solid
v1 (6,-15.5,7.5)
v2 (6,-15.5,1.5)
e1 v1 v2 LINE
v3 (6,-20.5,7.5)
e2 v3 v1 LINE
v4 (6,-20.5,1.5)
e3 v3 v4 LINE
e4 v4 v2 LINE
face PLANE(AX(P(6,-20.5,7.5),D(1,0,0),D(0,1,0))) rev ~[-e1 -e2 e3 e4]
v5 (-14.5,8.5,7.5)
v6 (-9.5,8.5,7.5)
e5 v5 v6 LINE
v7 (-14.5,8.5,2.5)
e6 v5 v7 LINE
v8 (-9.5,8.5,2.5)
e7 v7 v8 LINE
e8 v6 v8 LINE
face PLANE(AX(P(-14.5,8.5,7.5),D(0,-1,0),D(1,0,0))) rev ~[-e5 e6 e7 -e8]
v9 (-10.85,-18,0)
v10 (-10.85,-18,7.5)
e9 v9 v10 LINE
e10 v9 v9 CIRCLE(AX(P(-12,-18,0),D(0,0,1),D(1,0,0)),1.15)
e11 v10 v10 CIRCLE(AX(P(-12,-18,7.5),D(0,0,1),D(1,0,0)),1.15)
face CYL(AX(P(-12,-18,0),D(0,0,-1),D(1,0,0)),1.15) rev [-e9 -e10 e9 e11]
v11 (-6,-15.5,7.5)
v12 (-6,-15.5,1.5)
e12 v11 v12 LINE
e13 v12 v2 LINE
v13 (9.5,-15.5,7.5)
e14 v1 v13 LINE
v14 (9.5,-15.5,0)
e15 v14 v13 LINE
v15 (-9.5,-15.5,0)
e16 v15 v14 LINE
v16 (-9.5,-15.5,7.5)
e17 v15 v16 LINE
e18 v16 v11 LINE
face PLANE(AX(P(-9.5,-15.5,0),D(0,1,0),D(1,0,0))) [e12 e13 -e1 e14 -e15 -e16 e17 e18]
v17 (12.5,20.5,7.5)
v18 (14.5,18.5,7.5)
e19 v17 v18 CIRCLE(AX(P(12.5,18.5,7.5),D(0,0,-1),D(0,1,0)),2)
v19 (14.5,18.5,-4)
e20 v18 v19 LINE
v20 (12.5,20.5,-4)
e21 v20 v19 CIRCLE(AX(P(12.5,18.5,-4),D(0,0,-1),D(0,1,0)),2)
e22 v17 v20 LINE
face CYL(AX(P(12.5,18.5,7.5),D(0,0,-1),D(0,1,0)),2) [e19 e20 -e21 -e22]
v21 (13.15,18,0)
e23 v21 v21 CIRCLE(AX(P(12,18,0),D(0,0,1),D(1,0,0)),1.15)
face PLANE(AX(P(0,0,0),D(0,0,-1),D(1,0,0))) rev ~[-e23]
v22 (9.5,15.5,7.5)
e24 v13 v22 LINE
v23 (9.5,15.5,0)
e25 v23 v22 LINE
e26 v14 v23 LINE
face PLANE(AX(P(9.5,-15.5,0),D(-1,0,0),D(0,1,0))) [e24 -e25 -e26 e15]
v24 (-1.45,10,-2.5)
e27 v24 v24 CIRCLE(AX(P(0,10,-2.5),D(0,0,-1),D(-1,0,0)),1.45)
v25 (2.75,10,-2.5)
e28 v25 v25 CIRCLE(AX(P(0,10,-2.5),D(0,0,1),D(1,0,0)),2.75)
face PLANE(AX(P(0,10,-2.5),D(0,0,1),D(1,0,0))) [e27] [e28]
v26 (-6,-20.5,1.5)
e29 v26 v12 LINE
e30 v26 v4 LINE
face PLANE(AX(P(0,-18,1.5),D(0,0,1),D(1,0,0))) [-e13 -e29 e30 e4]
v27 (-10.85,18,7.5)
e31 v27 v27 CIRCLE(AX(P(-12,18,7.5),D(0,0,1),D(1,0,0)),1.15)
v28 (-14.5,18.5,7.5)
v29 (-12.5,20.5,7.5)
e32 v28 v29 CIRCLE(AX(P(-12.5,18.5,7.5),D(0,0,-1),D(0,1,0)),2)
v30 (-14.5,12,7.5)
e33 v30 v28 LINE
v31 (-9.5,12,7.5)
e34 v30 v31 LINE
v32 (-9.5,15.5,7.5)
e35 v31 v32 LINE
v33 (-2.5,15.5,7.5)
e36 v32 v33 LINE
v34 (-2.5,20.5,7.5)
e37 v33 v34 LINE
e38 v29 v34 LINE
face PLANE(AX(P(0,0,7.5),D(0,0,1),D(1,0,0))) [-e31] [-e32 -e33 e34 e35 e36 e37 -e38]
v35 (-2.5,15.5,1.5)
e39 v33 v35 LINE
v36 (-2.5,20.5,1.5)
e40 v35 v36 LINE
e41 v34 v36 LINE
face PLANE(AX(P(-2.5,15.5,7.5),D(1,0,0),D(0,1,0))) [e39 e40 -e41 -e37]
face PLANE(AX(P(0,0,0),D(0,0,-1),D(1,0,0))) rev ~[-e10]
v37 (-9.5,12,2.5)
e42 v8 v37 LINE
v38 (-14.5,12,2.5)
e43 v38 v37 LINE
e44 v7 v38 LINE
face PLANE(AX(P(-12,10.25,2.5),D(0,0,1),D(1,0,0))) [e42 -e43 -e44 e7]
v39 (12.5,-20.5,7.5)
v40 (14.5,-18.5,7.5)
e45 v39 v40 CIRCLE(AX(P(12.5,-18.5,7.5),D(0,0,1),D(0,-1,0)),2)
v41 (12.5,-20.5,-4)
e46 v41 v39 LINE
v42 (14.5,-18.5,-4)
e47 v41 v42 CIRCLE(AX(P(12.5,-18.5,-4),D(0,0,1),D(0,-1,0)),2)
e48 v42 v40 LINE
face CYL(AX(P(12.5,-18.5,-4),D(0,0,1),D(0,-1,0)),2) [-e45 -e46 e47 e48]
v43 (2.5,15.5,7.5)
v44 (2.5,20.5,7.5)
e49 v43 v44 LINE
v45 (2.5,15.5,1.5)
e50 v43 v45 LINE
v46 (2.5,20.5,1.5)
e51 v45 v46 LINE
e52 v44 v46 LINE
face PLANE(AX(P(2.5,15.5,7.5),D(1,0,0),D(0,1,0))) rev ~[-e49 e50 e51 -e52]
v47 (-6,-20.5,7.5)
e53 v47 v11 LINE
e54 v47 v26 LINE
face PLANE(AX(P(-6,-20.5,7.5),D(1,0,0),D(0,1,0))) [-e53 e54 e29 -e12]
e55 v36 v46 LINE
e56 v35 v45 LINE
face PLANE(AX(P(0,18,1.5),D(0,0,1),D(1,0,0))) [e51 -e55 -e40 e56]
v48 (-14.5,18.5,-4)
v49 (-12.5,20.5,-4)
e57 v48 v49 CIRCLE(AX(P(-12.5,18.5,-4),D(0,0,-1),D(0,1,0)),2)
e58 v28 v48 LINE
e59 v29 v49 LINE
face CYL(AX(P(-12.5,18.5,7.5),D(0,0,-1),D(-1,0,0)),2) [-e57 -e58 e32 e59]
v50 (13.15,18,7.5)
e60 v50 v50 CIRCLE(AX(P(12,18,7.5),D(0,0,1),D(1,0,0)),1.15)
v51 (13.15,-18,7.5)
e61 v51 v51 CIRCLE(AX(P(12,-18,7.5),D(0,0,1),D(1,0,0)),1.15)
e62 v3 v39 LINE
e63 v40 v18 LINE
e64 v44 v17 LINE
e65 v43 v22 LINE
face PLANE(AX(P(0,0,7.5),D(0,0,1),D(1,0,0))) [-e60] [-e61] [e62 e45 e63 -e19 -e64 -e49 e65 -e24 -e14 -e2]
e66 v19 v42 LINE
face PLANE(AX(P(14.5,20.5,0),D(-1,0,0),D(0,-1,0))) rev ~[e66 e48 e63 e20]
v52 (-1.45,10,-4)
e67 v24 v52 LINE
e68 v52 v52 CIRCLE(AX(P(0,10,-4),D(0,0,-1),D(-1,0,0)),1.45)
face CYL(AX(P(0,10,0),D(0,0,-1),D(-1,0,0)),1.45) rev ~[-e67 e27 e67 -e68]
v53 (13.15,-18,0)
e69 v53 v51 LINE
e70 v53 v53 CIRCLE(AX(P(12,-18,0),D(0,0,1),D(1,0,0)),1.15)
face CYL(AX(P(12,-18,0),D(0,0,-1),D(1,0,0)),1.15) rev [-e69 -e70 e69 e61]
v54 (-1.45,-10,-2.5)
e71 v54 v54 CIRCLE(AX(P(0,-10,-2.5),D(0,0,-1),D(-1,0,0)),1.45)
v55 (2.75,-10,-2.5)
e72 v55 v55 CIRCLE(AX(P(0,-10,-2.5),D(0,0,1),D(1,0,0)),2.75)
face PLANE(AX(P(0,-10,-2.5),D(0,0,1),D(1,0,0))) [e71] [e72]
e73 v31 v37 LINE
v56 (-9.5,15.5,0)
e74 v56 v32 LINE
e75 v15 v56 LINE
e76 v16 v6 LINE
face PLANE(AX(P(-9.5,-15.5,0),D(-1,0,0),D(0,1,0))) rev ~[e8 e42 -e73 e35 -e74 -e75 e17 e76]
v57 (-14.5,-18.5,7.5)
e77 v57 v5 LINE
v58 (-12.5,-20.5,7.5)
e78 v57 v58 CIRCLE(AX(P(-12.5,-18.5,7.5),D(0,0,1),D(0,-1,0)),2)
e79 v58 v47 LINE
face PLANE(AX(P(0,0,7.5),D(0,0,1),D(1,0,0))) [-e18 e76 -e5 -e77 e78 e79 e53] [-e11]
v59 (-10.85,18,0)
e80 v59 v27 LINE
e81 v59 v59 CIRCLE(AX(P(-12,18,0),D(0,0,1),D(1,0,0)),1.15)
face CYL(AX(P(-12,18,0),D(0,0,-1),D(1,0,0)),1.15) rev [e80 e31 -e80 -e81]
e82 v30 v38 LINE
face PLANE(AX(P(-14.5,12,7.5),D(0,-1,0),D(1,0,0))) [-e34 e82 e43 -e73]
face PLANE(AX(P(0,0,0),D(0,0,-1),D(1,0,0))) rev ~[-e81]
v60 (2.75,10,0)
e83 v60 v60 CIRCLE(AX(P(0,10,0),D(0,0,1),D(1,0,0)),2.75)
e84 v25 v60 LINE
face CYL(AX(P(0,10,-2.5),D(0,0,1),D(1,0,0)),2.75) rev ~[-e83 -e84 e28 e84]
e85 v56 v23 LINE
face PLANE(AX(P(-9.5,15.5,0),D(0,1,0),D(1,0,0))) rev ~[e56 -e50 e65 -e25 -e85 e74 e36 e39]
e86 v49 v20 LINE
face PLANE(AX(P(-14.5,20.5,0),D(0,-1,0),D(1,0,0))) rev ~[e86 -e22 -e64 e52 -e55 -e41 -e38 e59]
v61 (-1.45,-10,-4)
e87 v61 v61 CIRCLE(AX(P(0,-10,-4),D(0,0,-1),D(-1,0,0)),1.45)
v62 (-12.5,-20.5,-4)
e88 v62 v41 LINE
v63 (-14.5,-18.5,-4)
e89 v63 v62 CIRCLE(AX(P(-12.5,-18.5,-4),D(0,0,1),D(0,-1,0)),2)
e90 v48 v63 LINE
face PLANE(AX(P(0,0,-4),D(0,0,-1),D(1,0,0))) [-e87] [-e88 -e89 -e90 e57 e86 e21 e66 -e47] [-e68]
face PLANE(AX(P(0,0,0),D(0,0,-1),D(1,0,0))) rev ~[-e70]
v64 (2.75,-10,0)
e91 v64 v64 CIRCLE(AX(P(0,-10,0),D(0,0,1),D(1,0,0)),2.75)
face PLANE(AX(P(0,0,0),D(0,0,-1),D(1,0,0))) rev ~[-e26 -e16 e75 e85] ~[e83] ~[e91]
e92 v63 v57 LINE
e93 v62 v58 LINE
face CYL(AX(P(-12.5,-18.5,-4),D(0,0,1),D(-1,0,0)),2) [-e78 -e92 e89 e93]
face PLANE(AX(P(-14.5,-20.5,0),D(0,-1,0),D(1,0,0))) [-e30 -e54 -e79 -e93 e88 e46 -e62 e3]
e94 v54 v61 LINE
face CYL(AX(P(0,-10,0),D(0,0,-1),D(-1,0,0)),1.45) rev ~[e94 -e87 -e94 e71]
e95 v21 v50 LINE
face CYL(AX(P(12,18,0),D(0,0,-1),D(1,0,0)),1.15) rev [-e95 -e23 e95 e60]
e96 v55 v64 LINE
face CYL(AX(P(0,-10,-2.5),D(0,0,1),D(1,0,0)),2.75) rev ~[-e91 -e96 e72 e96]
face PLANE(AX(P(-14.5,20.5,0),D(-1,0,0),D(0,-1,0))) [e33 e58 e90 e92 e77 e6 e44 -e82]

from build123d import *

# Parameters (mm, degrees)
F0_W           = 29
F0_H           = 41
F0_R           = 1.15
F0_W_2         = 19
F0_H_2         = 31
F1_DEPTH       = 7.5
F2_W           = 29
F2_H           = 41
F2_R           = 1.15
F2_W_2         = 19
F2_H_2         = 31
F3_DEPTH       = 4
F4_W           = 12
F4_H           = 5
F4_W_2         = 5
F5_DEPTH       = 6
F6_R           = 2
F8_D           = 2.9
F8_CBORE_D     = 5.5
F8_CBORE_DEPTH = 2.5
F9_W           = 5
F9_H           = 3.5
F10_DEPTH      = 5


with BuildPart() as f1:
    # F0 (on Top) → F1 (new body)
    with BuildSketch(Plane.XY):
        Rectangle(F0_W, F0_H)
        with Locations((-12, -18)):
            Circle(F0_R, mode=Mode.SUBTRACT)
        with Locations((12, -18)):
            Circle(F0_R, mode=Mode.SUBTRACT)
        with Locations((-12, 18)):
            Circle(F0_R, mode=Mode.SUBTRACT)
        Rectangle(F0_W_2, F0_H_2, mode=Mode.SUBTRACT)
        with Locations((12, 18)):
            Circle(F0_R, mode=Mode.SUBTRACT)
    extrude(amount=F1_DEPTH)

    # F2 (on face) → F3 (join)
    with BuildSketch(Plane(origin=(0, 0, 0), x_dir=(1, 0, 0), z_dir=(0, 0, -1))):
        Rectangle(F2_W, F2_H)
        with Locations((-12, -18)):
            Circle(F2_R, mode=Mode.SUBTRACT)
        with Locations((12, -18)):
            Circle(F2_R, mode=Mode.SUBTRACT)
        with Locations((-12, 18)):
            Circle(F2_R, mode=Mode.SUBTRACT)
        Rectangle(F2_W_2, F2_H_2, mode=Mode.SUBTRACT)
        with Locations((12, 18)):
            Circle(F2_R, mode=Mode.SUBTRACT)
        with Locations((-12, 18)):
            Circle(F2_R)
        with Locations((12, 18)):
            Circle(F2_R)
        with Locations((-12, -18)):
            Circle(F2_R)
        Rectangle(F2_W_2, F2_H_2)
        with Locations((12, -18)):
            Circle(F2_R)
    extrude(amount=F3_DEPTH)

    # F4 (on face) → F5 (cut)
    with BuildSketch(Plane.XY.offset(7.5)):
        with Locations((0, -18)):
            Rectangle(F4_W, F4_H)
        with Locations((0, 18)):
            Rectangle(F4_W_2, F4_H)
    extrude(amount=-F5_DEPTH, mode=Mode.SUBTRACT)

    # F6
    f6_edges = [f1.edges().sort_by_distance(p)[0] for p in [
        (-14.5, 20.5, 1.75),
        (14.5, 20.5, 1.75),
        (14.5, -20.5, 1.75),
        (-14.5, -20.5, 1.75),
    ]]
    fillet(f6_edges, radius=F6_R)

    # F8 (through all)
    with Locations(Plane.XY):
        with Locations((0, 10), (0, -10)):
            CounterBoreHole(F8_D / 2, F8_CBORE_D / 2, F8_CBORE_DEPTH)

    # F9 (on face) → F10 (cut)
    with BuildSketch(Plane.XY.offset(7.5)):
        with Locations((-12, 10.25)):
            Rectangle(F9_W, F9_H)
    extrude(amount=-F10_DEPTH, mode=Mode.SUBTRACT)


solid = f1.part
